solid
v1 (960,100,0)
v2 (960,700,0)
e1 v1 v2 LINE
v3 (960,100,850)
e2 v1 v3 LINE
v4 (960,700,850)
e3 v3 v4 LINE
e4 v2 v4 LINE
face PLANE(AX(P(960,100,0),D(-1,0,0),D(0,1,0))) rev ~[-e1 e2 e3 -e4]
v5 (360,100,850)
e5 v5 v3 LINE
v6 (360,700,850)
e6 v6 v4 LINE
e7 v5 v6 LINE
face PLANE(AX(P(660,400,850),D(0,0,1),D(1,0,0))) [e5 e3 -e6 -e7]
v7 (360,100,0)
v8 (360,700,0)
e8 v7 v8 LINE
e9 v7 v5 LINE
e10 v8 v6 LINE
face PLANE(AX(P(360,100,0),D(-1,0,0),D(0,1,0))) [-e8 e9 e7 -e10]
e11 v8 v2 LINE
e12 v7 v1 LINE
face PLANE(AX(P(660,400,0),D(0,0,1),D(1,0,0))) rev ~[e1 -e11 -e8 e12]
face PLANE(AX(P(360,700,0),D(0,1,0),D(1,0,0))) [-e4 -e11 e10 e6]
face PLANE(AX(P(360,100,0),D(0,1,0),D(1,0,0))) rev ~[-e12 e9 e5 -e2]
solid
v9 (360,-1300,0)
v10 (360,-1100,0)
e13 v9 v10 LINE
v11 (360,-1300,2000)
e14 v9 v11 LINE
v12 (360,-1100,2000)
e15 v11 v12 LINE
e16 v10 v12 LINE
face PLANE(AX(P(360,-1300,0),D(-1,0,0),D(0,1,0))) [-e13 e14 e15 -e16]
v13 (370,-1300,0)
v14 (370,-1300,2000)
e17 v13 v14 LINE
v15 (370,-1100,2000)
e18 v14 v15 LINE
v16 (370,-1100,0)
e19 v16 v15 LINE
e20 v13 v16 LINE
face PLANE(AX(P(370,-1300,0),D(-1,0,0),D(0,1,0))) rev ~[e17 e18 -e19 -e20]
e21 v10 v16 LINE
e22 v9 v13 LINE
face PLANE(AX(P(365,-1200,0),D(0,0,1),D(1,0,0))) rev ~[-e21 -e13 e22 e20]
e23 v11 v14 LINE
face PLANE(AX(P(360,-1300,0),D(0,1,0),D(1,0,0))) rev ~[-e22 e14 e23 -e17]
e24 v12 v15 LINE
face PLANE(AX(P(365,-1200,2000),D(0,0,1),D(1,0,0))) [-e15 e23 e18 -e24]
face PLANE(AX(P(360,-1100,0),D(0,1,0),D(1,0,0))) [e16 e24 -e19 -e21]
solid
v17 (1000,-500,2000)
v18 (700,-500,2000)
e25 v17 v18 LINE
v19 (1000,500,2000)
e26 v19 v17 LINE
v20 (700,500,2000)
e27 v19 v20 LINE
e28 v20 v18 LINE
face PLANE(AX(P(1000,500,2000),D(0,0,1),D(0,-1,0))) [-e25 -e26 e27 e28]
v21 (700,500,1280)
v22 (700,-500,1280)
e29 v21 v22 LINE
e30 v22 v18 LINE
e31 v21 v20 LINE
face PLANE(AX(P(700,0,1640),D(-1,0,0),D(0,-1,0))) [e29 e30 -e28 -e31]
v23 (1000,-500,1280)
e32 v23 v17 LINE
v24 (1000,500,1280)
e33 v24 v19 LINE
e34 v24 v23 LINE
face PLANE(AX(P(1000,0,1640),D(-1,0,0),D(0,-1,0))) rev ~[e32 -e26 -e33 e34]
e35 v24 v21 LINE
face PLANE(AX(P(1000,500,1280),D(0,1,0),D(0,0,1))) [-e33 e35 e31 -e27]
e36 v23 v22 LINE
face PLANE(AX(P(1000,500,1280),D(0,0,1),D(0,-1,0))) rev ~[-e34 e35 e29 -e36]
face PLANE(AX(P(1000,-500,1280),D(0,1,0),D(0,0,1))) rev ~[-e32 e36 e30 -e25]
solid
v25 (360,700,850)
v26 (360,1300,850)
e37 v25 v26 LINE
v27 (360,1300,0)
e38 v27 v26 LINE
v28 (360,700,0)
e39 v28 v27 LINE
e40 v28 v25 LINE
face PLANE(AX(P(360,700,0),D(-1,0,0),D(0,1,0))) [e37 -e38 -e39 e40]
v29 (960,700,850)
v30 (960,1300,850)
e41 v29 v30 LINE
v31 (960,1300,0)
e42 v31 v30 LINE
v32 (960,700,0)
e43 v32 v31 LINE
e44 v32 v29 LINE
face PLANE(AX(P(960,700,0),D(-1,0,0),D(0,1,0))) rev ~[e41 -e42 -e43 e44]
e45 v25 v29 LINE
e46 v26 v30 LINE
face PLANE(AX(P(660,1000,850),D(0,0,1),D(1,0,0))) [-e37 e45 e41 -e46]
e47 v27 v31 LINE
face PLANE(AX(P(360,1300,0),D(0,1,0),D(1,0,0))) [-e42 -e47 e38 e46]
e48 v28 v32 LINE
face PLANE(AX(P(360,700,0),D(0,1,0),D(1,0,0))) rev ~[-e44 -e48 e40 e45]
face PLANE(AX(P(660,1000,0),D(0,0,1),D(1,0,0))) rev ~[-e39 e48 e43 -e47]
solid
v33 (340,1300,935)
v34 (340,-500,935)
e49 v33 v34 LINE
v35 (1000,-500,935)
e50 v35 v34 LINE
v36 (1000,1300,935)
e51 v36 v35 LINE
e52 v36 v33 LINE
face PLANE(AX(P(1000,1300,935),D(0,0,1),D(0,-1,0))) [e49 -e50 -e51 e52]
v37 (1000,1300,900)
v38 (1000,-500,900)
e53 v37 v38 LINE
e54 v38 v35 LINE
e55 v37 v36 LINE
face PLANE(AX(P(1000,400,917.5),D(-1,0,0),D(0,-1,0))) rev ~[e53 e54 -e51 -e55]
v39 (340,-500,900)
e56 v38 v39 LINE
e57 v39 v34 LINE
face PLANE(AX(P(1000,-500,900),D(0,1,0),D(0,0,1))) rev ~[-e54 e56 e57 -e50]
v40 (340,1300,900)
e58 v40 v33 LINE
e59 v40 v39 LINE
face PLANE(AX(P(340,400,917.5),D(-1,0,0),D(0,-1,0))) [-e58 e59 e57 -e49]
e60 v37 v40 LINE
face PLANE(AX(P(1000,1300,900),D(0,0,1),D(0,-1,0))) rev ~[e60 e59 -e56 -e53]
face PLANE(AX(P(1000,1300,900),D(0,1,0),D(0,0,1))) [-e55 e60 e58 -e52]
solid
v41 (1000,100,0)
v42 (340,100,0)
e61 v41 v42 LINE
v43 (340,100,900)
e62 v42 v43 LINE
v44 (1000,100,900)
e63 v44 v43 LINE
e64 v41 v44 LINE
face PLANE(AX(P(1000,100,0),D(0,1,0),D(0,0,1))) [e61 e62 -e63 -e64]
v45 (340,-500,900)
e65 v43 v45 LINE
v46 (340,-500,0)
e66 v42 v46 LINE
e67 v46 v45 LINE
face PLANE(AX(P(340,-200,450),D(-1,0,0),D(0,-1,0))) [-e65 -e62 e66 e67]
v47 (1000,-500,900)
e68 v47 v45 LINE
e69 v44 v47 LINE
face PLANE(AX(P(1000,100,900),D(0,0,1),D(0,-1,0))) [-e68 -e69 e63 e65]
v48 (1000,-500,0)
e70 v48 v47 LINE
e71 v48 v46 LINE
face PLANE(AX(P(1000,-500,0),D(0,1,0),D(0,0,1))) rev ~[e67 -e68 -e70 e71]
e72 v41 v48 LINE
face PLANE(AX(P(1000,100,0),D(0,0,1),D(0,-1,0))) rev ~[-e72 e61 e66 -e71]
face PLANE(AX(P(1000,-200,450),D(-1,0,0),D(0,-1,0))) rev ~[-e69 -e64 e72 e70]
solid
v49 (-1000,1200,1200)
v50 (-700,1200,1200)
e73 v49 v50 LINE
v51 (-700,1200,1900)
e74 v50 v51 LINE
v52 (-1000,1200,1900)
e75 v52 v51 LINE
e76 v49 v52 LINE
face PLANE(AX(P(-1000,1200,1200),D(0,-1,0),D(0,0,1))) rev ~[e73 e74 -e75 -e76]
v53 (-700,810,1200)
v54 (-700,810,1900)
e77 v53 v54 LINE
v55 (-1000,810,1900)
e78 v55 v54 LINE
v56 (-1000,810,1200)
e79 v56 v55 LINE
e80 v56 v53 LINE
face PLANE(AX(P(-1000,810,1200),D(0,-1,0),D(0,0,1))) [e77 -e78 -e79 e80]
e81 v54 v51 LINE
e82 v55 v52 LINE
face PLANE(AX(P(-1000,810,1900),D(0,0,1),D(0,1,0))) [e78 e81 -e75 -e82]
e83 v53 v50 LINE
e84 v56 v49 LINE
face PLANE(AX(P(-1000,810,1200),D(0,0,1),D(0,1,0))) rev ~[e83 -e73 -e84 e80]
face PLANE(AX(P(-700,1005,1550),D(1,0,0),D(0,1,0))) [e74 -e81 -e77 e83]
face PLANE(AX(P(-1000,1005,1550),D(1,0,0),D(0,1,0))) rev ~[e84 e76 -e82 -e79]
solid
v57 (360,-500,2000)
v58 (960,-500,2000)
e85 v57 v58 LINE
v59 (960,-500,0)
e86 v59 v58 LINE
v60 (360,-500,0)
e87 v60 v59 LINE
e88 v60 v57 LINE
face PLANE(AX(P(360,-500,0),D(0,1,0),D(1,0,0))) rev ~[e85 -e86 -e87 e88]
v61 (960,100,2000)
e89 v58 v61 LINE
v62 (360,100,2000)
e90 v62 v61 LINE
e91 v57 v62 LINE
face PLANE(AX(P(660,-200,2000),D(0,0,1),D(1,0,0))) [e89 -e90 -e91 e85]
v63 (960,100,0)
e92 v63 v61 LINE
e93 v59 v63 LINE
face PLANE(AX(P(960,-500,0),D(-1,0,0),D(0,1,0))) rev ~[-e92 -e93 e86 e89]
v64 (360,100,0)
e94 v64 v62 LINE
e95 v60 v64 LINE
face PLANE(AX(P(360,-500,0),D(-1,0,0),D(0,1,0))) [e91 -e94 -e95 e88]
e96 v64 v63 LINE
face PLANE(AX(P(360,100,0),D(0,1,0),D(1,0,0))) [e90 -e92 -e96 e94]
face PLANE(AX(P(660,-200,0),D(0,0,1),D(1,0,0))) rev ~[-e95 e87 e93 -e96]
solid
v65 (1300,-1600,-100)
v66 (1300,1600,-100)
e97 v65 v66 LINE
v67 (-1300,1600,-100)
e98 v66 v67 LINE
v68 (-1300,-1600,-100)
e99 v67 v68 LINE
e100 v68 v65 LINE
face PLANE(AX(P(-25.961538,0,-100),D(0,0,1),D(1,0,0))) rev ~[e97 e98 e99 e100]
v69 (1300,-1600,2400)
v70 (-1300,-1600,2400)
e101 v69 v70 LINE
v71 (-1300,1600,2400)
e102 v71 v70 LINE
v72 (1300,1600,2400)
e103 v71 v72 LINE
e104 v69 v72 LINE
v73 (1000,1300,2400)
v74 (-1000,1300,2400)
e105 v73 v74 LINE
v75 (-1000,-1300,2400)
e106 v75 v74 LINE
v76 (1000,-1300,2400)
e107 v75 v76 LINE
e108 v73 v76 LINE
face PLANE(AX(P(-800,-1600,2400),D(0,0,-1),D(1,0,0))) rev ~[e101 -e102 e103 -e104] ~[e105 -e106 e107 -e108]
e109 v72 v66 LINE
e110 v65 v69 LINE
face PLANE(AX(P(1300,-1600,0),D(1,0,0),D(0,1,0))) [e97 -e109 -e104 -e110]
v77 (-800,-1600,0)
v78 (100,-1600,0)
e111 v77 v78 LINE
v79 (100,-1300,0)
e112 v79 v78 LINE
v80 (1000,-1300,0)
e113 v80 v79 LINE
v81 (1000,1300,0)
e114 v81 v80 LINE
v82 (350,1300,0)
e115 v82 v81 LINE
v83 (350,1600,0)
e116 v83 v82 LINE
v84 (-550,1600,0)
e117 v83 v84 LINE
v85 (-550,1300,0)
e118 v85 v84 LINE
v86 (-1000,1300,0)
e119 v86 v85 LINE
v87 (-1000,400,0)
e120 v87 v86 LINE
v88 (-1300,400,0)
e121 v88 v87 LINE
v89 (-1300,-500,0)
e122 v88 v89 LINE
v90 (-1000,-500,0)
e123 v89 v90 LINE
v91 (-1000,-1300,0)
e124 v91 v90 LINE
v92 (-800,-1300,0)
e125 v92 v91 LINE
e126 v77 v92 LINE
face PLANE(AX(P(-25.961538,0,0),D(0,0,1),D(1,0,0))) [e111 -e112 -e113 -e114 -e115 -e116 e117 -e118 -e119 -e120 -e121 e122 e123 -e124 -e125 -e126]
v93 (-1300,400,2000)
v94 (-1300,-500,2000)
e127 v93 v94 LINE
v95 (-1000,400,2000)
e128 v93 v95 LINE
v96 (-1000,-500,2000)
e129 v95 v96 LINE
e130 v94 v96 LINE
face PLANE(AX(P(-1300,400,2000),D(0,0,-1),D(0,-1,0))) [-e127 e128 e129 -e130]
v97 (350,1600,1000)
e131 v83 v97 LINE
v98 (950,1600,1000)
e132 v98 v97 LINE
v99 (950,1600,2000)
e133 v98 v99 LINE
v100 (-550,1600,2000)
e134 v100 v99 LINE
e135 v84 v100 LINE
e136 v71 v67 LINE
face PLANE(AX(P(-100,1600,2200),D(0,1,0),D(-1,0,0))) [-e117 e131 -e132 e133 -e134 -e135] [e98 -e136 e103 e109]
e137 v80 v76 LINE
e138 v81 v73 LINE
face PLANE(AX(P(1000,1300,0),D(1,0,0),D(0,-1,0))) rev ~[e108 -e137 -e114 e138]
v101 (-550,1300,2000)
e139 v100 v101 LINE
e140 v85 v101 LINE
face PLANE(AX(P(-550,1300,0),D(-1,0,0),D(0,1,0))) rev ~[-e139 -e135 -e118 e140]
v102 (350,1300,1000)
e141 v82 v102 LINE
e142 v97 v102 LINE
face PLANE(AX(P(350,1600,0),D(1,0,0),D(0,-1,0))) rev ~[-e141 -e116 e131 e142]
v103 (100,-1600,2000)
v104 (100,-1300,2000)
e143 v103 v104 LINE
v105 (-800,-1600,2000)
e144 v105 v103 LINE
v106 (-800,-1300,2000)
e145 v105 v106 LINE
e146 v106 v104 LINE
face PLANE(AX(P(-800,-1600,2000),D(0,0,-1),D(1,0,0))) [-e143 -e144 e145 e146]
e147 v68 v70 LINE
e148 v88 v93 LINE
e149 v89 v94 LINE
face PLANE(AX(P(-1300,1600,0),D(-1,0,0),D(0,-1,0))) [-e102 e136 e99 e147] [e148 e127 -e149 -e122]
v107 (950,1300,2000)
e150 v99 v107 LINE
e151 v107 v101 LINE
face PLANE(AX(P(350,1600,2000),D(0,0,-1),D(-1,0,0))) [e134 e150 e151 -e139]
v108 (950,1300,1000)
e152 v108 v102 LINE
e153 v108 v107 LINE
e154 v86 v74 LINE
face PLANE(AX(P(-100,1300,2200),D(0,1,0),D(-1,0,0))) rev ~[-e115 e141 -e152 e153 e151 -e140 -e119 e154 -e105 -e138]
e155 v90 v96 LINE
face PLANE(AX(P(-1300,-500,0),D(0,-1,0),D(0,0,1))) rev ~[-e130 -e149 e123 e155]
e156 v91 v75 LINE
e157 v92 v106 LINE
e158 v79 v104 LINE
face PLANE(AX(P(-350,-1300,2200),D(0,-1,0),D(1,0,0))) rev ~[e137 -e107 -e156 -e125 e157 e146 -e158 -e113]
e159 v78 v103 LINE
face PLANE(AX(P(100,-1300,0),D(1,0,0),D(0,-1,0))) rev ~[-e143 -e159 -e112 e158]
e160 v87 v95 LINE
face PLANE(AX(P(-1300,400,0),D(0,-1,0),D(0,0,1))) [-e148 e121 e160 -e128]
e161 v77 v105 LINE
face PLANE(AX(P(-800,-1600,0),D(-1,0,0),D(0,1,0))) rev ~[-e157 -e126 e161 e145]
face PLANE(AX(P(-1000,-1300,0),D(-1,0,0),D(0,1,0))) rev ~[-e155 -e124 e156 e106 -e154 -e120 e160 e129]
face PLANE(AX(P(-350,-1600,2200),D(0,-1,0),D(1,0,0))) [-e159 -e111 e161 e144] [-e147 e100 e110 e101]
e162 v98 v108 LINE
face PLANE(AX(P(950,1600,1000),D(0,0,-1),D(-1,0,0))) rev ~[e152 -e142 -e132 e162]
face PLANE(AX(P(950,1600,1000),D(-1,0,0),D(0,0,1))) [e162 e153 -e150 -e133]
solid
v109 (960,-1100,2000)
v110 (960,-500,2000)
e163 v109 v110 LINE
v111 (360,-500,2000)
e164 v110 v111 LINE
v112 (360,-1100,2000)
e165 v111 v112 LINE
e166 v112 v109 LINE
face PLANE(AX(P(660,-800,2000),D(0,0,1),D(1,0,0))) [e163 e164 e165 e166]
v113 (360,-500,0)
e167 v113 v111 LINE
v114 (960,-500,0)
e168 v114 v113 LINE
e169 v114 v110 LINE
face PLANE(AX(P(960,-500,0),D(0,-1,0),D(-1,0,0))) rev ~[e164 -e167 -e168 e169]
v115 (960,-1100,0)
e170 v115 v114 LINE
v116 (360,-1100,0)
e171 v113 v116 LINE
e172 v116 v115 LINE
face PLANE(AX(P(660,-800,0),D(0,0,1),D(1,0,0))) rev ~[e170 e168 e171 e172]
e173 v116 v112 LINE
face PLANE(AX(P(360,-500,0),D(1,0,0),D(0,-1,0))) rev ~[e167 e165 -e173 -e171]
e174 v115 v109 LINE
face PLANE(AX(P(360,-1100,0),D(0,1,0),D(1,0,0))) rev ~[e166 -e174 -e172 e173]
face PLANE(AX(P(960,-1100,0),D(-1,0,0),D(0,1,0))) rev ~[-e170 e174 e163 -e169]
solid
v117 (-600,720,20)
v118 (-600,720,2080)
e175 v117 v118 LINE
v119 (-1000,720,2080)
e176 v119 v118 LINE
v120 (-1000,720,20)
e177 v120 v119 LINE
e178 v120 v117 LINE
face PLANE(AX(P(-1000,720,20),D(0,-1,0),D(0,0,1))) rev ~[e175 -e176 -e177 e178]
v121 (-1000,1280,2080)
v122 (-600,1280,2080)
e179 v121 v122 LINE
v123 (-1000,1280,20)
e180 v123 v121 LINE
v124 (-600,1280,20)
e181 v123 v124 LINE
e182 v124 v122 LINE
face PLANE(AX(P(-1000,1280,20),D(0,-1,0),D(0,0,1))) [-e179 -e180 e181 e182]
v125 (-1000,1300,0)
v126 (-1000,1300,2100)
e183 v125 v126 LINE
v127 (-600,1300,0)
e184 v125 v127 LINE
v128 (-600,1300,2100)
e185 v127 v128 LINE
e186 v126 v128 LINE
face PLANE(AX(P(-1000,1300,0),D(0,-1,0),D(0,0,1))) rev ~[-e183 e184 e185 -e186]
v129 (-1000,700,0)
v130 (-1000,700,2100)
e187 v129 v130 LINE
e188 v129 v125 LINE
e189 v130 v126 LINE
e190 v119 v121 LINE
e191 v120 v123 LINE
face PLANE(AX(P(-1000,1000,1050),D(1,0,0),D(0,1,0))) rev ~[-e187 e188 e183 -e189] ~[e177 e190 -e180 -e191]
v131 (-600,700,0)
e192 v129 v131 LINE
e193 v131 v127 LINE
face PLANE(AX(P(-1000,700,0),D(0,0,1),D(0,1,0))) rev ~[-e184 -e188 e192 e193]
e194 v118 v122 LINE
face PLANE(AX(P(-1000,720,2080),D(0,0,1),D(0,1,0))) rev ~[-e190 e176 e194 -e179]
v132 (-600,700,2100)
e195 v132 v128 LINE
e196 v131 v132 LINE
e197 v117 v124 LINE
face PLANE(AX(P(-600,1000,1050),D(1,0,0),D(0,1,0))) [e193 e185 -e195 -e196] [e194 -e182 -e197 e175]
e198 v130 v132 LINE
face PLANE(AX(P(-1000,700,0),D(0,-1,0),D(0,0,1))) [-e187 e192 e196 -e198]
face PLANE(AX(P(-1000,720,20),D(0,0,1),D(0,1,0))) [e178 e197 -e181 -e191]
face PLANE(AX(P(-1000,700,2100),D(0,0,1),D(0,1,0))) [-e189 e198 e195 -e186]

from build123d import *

# Parameters (mm, degrees)
F1_DEPTH  = 2400
F2_DEPTH  = 100
F3_W      = 600
F3_H      = 600
F4_DEPTH  = 850
F5_DEPTH  = 850
F6_DEPTH  = 2000
F7_DEPTH  = 2000
F3_W_2    = 10
F3_H_2    = 200
F8_DEPTH  = 2000
F9_W      = 600
F9_H      = 1000
F10_DEPTH = 300
F9_W_2    = 900
F9_H_2    = 400
F11_DEPTH = 300
F12_W     = 900
F12_H     = 400
F13_DEPTH = 300
F14_W     = 900
F14_H     = 2000
F15_DEPTH = 300
F16_W     = 1000
F16_H     = 720
F17_DEPTH = 300
F18_W     = 390
F18_H     = 700
F19_DEPTH = 300
F20_W     = 600
F20_H     = 2100
F20_W_2   = 560
F20_H_2   = 2060
F21_DEPTH = 400
F22_W     = 600
F22_H     = 900
F23_DEPTH = 660
F24_W     = 1800
F24_H     = 35
F25_DEPTH = 660


# Not quite as in the source:
# - a feature names something its author has since deleted; it is built from what else it names


with BuildPart() as f1:
    # F0 (on Top) → F1 (new body)
    with BuildSketch(Plane.XY):
        Polygon((1300, 1600), (350, 1600), (350, 1300), (1000, 1300), (1000, -1300), (100, -1300), (100, -1600), (1300, -1600), align=None)
    extrude(amount=F1_DEPTH)



with BuildPart() as f1b:
    # F0 (on Top) → F1, piece 2 (new body)
    with BuildSketch(Plane.XY):
        Polygon((-1000, -1300), (-1000, 1300), (-550, 1300), (-550, 1600), (-1300, 1600), (-1300, -1600), (-800, -1600), (-800, -1300), align=None)
    extrude(amount=F1_DEPTH)


with BuildPart() as f1_1:
    add(f1.part)

    add(f1b.part)  # F2 merges F1b
    # F0 (on Top) → F2 (join)
    with BuildSketch(Plane.XY):
        Polygon((-550, 1300), (-1000, 1300), (-1000, -1300), (-800, -1300), (-800, -1600), (100, -1600), (100, -1300), (1000, -1300), (1000, 1300), (350, 1300), (350, 1600), (-550, 1600), align=None)
        Polygon((-1000, -1300), (-1000, 1300), (-550, 1300), (-550, 1600), (-1300, 1600), (-1300, -1600), (-800, -1600), (-800, -1300), align=None)
        Polygon((1300, 1600), (350, 1600), (350, 1300), (1000, 1300), (1000, -1300), (100, -1300), (100, -1600), (1300, -1600), align=None)
    extrude(amount=-F2_DEPTH)

    # F9 (on face) → F10 (cut, through all)
    with BuildSketch(Plane(origin=(0, 1600, 0), x_dir=(-1, 0, 0), z_dir=(0, 1, 0))):
        with Locations((-650, 1500)):
            Rectangle(F9_W, F9_H)
    extrude(amount=-F10_DEPTH, mode=Mode.SUBTRACT)

    # F9 (on face) → F11 (join, through all)
    with BuildSketch(Plane(origin=(0, 1600, 0), x_dir=(-1, 0, 0), z_dir=(0, 1, 0))):
        with Locations((100, 2200)):
            Rectangle(F9_W_2, F9_H_2)
    extrude(amount=-F11_DEPTH)

    # F12 (on face) → F13 (join, through all)
    with BuildSketch(Plane.XZ.offset(1600)):
        with Locations((-350, 2200)):
            Rectangle(F12_W, F12_H)
    extrude(amount=-F13_DEPTH)

    # F14 (on face) → F15 (cut, through all)
    with BuildSketch(Plane(origin=(-1300, 0, 0), x_dir=(0, -1, 0), z_dir=(-1, 0, 0))):
        with Locations((50, 1000)):
            Rectangle(F14_W, F14_H)
    extrude(amount=-F15_DEPTH, mode=Mode.SUBTRACT)


with BuildPart() as f4:
    # F3 (on face) → F4 (new body)
    with BuildSketch(Plane.XY):
        with Locations((660, 1000)):
            Rectangle(F3_W, F3_H)
    extrude(amount=F4_DEPTH)


with BuildPart() as f5:
    # F3 (on face) → F5 (new body)
    with BuildSketch(Plane.XY):
        with Locations((660, 400)):
            Rectangle(F3_W, F3_H)
    extrude(amount=F5_DEPTH)


with BuildPart() as f6:
    # F3 (on face) → F6 (new body)
    with BuildSketch(Plane.XY):
        with Locations((660, -200)):
            Rectangle(F3_W, F3_H)
    extrude(amount=F6_DEPTH)


with BuildPart() as f7:
    # F3 (on face) → F7 (new body)
    with BuildSketch(Plane.XY):
        Polygon((960, -1100), (960, -500), (360, -500), (360, -1100), (370, -1100), align=None)
    extrude(amount=F7_DEPTH)


with BuildPart() as f8:
    # F3 (on face) → F8 (new body)
    with BuildSketch(Plane.XY):
        with Locations((365, -1200)):
            Rectangle(F3_W_2, F3_H_2)
    extrude(amount=F8_DEPTH)


with BuildPart() as f17:
    # F16 (on face) → F17 (new body)
    with BuildSketch(Plane(origin=(1000, 0, 0), x_dir=(0, -1, 0), z_dir=(-1, 0, 0))):
        with Locations((0, 1640)):
            Rectangle(F16_W, F16_H)
    extrude(amount=F17_DEPTH)


with BuildPart() as f19:
    # F18 (on face) → F19 (new body)
    with BuildSketch(Plane.YZ.offset(-1000)):
        with Locations((1005, 1550)):
            Rectangle(F18_W, F18_H)
    extrude(amount=F19_DEPTH)


with BuildPart() as f21:
    # F20 (on face) → F21 (new body)
    with BuildSketch(Plane.YZ.offset(-1000)):
        with Locations((1000, 1050)):
            Rectangle(F20_W, F20_H)
        with Locations((1000, 1050)):
            Rectangle(F20_W_2, F20_H_2, mode=Mode.SUBTRACT)
    extrude(amount=F21_DEPTH)


with BuildPart() as f23:
    # F22 (on face) → F23 (new body)
    with BuildSketch(Plane(origin=(1000, 0, 0), x_dir=(0, -1, 0), z_dir=(-1, 0, 0))):
        with Locations((200, 450)):
            Rectangle(F22_W, F22_H)
    extrude(amount=F23_DEPTH)


with BuildPart() as f25:
    # F24 (on face) → F25 (new body, through all)
    with BuildSketch(Plane(origin=(1000, 0, 0), x_dir=(0, -1, 0), z_dir=(-1, 0, 0))):
        with Locations((-400, 917.5)):
            Rectangle(F24_W, F24_H)
    extrude(amount=F25_DEPTH)


solid = Compound([f1_1.part, f4.part, f5.part, f6.part, f7.part, f8.part, f17.part, f19.part, f21.part, f23.part, f25.part])
